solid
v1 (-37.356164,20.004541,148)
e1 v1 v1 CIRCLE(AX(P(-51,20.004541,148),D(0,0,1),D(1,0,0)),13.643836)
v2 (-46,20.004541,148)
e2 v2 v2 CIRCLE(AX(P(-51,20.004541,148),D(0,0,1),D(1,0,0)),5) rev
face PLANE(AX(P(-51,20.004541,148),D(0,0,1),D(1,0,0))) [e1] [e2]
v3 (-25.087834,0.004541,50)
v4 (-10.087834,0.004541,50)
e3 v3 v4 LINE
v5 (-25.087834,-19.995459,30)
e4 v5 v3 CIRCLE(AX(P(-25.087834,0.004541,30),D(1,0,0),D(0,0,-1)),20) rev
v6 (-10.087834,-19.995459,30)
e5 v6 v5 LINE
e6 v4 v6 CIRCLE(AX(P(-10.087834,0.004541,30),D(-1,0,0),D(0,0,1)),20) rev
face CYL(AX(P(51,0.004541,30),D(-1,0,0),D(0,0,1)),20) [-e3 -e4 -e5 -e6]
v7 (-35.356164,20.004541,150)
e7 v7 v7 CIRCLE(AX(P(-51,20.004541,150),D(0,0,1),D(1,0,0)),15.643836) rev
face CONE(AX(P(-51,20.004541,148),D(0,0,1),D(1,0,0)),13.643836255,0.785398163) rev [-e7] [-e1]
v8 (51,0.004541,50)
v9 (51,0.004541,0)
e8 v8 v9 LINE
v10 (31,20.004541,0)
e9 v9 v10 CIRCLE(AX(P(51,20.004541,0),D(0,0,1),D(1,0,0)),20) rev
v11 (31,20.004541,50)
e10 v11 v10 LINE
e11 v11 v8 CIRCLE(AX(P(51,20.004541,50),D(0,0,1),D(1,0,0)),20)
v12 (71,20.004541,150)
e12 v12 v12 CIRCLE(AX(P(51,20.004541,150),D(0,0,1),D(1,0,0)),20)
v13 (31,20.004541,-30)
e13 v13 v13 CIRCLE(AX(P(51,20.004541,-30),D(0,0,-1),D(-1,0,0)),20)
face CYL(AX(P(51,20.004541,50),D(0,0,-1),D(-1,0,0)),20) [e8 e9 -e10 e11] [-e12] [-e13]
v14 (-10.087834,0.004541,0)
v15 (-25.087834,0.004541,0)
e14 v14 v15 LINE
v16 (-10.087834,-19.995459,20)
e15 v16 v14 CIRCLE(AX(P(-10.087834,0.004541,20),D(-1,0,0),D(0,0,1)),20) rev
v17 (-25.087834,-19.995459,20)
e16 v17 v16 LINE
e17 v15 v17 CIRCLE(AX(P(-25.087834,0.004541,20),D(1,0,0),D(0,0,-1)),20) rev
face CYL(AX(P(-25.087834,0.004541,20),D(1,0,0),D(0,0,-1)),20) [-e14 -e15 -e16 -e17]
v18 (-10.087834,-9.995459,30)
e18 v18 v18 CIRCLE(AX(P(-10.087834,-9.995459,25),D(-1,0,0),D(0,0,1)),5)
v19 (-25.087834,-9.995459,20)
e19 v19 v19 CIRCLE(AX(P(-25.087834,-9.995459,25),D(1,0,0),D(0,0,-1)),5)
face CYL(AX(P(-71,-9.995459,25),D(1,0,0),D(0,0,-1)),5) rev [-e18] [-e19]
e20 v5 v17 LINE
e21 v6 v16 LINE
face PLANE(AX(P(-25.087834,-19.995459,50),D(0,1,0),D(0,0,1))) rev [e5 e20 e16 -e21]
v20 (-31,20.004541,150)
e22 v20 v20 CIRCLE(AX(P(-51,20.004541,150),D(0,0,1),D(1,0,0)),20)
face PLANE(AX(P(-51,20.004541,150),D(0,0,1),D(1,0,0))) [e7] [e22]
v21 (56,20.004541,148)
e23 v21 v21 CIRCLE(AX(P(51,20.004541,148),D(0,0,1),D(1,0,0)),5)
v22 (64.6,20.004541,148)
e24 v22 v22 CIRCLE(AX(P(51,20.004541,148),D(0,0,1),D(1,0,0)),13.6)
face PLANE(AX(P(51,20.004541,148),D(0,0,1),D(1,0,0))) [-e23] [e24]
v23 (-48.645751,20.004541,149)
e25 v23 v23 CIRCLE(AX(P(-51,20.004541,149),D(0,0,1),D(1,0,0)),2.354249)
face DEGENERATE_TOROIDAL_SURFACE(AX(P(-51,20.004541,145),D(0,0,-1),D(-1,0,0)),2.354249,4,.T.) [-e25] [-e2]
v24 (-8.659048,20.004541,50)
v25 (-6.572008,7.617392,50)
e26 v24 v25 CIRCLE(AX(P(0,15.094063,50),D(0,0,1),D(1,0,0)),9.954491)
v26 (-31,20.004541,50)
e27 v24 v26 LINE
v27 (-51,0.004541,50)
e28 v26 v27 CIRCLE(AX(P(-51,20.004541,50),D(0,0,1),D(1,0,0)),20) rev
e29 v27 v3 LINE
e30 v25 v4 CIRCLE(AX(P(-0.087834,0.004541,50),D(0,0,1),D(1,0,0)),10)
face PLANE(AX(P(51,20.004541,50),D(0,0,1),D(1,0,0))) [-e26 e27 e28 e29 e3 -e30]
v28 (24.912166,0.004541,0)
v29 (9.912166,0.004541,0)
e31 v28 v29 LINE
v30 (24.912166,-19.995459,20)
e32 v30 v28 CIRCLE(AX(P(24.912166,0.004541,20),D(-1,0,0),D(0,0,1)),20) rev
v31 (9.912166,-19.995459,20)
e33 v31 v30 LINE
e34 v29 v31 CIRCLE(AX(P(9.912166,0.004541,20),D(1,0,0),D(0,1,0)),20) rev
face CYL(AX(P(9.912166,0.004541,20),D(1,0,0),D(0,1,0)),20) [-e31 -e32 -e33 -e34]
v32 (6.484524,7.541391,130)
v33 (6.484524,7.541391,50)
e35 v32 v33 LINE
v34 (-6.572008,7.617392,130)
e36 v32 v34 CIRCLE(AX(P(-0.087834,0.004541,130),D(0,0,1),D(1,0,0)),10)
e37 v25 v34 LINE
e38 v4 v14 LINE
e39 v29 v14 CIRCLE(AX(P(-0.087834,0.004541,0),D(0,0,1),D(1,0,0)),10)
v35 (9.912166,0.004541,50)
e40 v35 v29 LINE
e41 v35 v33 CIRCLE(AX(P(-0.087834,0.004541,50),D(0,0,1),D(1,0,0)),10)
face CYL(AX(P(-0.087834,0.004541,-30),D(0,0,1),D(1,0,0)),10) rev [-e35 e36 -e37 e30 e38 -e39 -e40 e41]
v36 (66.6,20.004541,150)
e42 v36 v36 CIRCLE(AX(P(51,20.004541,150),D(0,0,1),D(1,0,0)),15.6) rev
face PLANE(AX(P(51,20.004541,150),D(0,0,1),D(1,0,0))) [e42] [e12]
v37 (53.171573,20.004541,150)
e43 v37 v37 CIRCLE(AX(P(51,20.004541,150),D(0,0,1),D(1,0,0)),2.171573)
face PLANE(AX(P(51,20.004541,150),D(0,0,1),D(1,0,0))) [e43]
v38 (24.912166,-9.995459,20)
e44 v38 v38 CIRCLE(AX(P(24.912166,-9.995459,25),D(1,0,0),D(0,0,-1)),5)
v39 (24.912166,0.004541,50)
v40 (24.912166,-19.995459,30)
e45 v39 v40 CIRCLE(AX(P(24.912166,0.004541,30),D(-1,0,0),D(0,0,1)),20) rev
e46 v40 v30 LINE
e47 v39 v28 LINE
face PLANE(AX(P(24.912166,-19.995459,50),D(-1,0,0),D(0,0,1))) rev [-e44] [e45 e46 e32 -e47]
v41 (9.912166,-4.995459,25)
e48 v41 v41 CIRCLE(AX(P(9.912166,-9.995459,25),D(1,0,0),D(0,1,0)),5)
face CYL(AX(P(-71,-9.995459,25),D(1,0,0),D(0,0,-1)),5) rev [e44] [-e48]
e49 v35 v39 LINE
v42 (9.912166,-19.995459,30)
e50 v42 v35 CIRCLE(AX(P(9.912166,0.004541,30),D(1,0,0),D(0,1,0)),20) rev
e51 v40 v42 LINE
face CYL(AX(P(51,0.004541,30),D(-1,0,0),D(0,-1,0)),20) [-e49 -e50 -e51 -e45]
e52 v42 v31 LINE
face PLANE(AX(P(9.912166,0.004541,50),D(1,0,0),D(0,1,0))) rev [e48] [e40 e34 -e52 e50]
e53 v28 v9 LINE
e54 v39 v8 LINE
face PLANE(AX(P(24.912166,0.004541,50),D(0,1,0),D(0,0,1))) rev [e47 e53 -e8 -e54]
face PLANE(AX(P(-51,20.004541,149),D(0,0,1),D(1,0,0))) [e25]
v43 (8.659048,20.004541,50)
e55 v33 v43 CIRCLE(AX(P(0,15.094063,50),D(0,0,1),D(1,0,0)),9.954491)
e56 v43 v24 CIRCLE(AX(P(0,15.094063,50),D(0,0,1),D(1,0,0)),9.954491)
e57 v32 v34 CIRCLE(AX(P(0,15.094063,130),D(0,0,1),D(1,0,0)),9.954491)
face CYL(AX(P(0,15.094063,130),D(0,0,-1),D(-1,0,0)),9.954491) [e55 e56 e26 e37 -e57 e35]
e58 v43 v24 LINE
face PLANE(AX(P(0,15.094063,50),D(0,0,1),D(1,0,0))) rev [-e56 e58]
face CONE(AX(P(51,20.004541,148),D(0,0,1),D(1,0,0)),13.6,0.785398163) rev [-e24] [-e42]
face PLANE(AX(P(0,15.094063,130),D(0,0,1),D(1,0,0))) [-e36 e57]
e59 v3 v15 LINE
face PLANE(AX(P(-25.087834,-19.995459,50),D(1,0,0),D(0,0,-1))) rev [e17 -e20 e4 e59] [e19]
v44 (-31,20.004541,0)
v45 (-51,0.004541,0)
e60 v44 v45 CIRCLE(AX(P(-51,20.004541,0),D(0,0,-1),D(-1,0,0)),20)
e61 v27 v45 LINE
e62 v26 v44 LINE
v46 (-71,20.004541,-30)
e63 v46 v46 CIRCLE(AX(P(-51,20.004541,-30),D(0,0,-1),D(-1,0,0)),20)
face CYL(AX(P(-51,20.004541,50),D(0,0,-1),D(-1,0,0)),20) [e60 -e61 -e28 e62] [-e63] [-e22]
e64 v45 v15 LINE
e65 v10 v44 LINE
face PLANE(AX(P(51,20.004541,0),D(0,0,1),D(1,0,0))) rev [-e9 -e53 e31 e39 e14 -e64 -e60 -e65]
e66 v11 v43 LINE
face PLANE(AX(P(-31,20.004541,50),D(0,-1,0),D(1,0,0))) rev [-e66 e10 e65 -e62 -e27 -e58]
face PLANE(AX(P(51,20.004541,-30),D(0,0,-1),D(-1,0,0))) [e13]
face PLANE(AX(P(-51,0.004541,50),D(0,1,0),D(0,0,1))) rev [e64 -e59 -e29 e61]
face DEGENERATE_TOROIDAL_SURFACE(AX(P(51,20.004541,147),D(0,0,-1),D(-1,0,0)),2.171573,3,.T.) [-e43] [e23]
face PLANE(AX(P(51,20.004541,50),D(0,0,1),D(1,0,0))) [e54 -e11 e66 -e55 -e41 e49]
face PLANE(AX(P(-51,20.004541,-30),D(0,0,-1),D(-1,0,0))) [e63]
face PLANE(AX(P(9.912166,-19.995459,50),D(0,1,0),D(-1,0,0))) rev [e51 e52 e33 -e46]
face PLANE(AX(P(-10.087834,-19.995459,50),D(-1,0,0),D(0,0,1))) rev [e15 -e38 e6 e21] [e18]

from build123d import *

# Parameters (mm, degrees)
BOSS_EXTRUDE1_DEPTH      = 50
SKETCH4_R                = 5
CUT_EXTRUDE1_DEPTH       = 116.323487875
FILLET2_R                = 20
SKETCH6_R                = 20
BOSS_EXTRUDE4_DEPTH      = 100
BOSS_EXTRUDE5_START      = 30
SKETCH7_R                = 20
BOSS_EXTRUDE5_DEPTH      = 30
SKETCH8_R                = 9.954491404
BOSS_EXTRUDE8_DEPTH      = 80
CUT_EXTRUDE2_DEPTH       = 130.001408198
CUT_EXTRUDE2_DEPTH_BACK  = 130.001408198
SKETCH9_R                = 13.643836255
CUT_EXTRUDE3_DEPTH       = 2
BOSS_EXTRUDE9_START      = 148
BOSS_EXTRUDE9_OUTLINE_R  = 5
BOSS_EXTRUDE9_DEPTH      = 1
CHAMFER1_SIZE            = 2
SKETCH11_R               = 13.6
CUT_EXTRUDE4_DEPTH       = 2
BOSS_EXTRUDE10_START     = 148
BOSS_EXTRUDE10_OUTLINE_R = 5
BOSS_EXTRUDE10_DEPTH     = 2
FILLET5_R                = 4
FILLET6_R                = 3
CHAMFER3_SIZE            = 2


# Read off the part's stored shape, not the designer's step: Boss-Extrude9, Boss-Extrude10
# Some blends are built 0.0001 mm under size
with BuildPart() as part:
    # Sketch1 → Boss-Extrude1 (new body)
    with BuildSketch(Plane.XY):
        with BuildLine():
            Line((-25.087834251, -19.995458795), (-10.087834251, -19.995458795))
            Line((-10.087834251, -19.995458795), (-10.087834251, 0.004541205))
            Line((-10.087834251, 0.004541205), (9.912165749, 0.004541205))
            Line((9.912165749, 0.004541205), (9.912165749, -19.995458795))
            Line((9.912165749, -19.995458795), (24.912165749, -19.995458795))
            Line((24.912165749, -19.995458795), (24.912165749, 0.004541205))
            Line((24.912165749, 0.004541205), (51, 0.004541205))
            ThreePointArc((51, 0.004541205), (65.142135624, 34.146676829), (31, 20.004541205))
            Line((31, 20.004541205), (-31, 20.004541205))
            ThreePointArc((-31, 20.004541205), (-65.142135624, 34.146676829), (-51, 0.004541205))
            Line((-51, 0.004541205), (-25.087834251, 0.004541205))
            Line((-25.087834251, 0.004541205), (-25.087834251, -19.995458795))
        make_face()
    extrude(amount=BOSS_EXTRUDE1_DEPTH)

    # Sketch4 → Cut-Extrude1 (cut, through all)
    with BuildSketch(Plane(origin=(24.912165749, 0, 0), x_dir=(0, 0, -1), z_dir=(1, 0, 0))):
        with Locations((-25, -9.995458795)):
            Circle(SKETCH4_R)
    extrude(amount=-CUT_EXTRUDE1_DEPTH, mode=Mode.SUBTRACT)

    # Fillet2
    fillet2_edges = [part.edges().sort_by_distance(p)[0] for p in [
        (-17.587834251, -19.995458795, 50),
        (-17.587834251, -19.995458795, 0),
        (17.412165749, -19.995458795, 0),
        (17.412165749, -19.995458795, 50),
    ]]
    fillet(fillet2_edges, radius=FILLET2_R)

    # Sketch6 → Boss-Extrude4 (add)
    with BuildSketch(Plane.XY.offset(50)):
        with Locations((-51, 20.004541205)):
            Circle(SKETCH6_R)
        with Locations(Location((51, 20.004541205, 0), (0, 0, 180))):
            Circle(SKETCH6_R)
    extrude(amount=BOSS_EXTRUDE4_DEPTH)

    # Sketch7 → Boss-Extrude5 (add)
    with BuildSketch(Plane(origin=(0, 0, 0), x_dir=(-1, 0, 0), z_dir=(0, 0, -1)).offset(BOSS_EXTRUDE5_START)):
        with Locations((-51, 20.004541205)):
            Circle(SKETCH7_R)
        with Locations((51, 20.004541205)):
            Circle(SKETCH7_R)
    extrude(amount=-BOSS_EXTRUDE5_DEPTH)

    # Sketch8 → Boss-Extrude8 (add)
    with BuildSketch(Plane.XY.offset(50)):
        with Locations(Location((0, 15.094063168, 0), (0, 0, 150.442767445))):
            Circle(SKETCH8_R)
    extrude(amount=BOSS_EXTRUDE8_DEPTH)

    # Sketch5 → Cut-Extrude2 (cut, two sides: drawn at the far end of the back side and taken through both)
    with BuildSketch(Plane.XY.offset(50).offset(-CUT_EXTRUDE2_DEPTH_BACK)):
        with BuildLine():
            Line((-10.087834251, 0.004541205), (9.912165749, 0.004541205))
            ThreePointArc((9.912165749, 0.004541205), (-0.087834251, 10.004541205), (-10.087834251, 0.004541205))
        make_face()
    extrude(amount=CUT_EXTRUDE2_DEPTH + CUT_EXTRUDE2_DEPTH_BACK, mode=Mode.SUBTRACT)

    # Sketch9 → Cut-Extrude3 (cut)
    with BuildSketch(Plane.XY.offset(150)):
        with Locations((-51, 20.004541205)):
            Circle(SKETCH9_R)
    extrude(amount=-CUT_EXTRUDE3_DEPTH, mode=Mode.SUBTRACT)

    # Boss-Extrude9 outline → Boss-Extrude9 (add)
    with BuildSketch(Plane.XY.offset(BOSS_EXTRUDE9_START)):
        with Locations((-51, 20.004541205)):
            Circle(BOSS_EXTRUDE9_OUTLINE_R)
    extrude(amount=BOSS_EXTRUDE9_DEPTH)

    # Chamfer1
    chamfer1_edges = [part.edges().sort_by_distance(p)[0] for p in [
        (-64.643836255, 20.004541205, 150),
    ]]
    chamfer(chamfer1_edges, length=CHAMFER1_SIZE - 0.0001)  # a hair under: the kernel refuses the full size

    # Sketch11 → Cut-Extrude4 (cut)
    with BuildSketch(Plane.XY.offset(150)):
        with Locations((51, 20.004541205)):
            Circle(SKETCH11_R)
    extrude(amount=-CUT_EXTRUDE4_DEPTH, mode=Mode.SUBTRACT)

    # Boss-Extrude10 outline → Boss-Extrude10 (add)
    with BuildSketch(Plane.XY.offset(BOSS_EXTRUDE10_START)):
        with Locations((51, 20.004541205)):
            Circle(BOSS_EXTRUDE10_OUTLINE_R)
    extrude(amount=BOSS_EXTRUDE10_DEPTH)

    # Fillet5
    # the kernel refuses this fillet: 4 mm, written as the material it takes off along each edge
    with BuildSketch(Plane(origin=(-51, 20.004541205, 149), x_dir=(1, 0, 0), z_dir=(0, -1, 0))) as fillet5_piece_1:
        with BuildLine():
            CenterArc((2.354248689, -4), FILLET5_R, 48.590377891, 41.409622109)
            Line((2.354248689, 0), (2.354248689, 0.08))
            Line((2.354248689, 0.08), (5, 0.08))
            Line((5, 0.08), (5.08, 0))
            ThreePointArc((5.08, 0), (5.08, -0.5), (5.052915026, -0.94))
            Line((5.052915026, -0.94), (5, -1))
        make_face()
    revolve(axis=Axis((-51, 20.004541205, 149), (0, 0, 1)), mode=Mode.SUBTRACT)

    # Fillet6
    # the kernel refuses this fillet: 3 mm, written as the material it takes off along each edge
    with BuildSketch(Plane(origin=(51, 20.004541205, 150), x_dir=(1, 0, 0), z_dir=(0, -1, 0))) as fillet6_piece_1:
        with BuildLine():
            CenterArc((2.171572875, -3), FILLET6_R, 19.471220634, 70.528779366)
            Line((2.171572875, 0), (2.171572875, 0.06))
            Line((2.171572875, 0.06), (5, 0.06))
            Line((5, 0.06), (5.06, 0))
            ThreePointArc((5.06, 0), (5.06, -1), (5.056568542, -1.98))
            Line((5.056568542, -1.98), (5, -2))
        make_face()
    revolve(axis=Axis((51, 20.004541205, 150), (0, 0, 1)), mode=Mode.SUBTRACT)

    # Chamfer3
    chamfer3_edges = [part.edges().sort_by_distance(p)[0] for p in [
        (37.4, 20.004541205, 150),
    ]]
    chamfer(chamfer3_edges, length=CHAMFER3_SIZE - 0.0001)  # a hair under: the kernel refuses the full size


solid = part.part
